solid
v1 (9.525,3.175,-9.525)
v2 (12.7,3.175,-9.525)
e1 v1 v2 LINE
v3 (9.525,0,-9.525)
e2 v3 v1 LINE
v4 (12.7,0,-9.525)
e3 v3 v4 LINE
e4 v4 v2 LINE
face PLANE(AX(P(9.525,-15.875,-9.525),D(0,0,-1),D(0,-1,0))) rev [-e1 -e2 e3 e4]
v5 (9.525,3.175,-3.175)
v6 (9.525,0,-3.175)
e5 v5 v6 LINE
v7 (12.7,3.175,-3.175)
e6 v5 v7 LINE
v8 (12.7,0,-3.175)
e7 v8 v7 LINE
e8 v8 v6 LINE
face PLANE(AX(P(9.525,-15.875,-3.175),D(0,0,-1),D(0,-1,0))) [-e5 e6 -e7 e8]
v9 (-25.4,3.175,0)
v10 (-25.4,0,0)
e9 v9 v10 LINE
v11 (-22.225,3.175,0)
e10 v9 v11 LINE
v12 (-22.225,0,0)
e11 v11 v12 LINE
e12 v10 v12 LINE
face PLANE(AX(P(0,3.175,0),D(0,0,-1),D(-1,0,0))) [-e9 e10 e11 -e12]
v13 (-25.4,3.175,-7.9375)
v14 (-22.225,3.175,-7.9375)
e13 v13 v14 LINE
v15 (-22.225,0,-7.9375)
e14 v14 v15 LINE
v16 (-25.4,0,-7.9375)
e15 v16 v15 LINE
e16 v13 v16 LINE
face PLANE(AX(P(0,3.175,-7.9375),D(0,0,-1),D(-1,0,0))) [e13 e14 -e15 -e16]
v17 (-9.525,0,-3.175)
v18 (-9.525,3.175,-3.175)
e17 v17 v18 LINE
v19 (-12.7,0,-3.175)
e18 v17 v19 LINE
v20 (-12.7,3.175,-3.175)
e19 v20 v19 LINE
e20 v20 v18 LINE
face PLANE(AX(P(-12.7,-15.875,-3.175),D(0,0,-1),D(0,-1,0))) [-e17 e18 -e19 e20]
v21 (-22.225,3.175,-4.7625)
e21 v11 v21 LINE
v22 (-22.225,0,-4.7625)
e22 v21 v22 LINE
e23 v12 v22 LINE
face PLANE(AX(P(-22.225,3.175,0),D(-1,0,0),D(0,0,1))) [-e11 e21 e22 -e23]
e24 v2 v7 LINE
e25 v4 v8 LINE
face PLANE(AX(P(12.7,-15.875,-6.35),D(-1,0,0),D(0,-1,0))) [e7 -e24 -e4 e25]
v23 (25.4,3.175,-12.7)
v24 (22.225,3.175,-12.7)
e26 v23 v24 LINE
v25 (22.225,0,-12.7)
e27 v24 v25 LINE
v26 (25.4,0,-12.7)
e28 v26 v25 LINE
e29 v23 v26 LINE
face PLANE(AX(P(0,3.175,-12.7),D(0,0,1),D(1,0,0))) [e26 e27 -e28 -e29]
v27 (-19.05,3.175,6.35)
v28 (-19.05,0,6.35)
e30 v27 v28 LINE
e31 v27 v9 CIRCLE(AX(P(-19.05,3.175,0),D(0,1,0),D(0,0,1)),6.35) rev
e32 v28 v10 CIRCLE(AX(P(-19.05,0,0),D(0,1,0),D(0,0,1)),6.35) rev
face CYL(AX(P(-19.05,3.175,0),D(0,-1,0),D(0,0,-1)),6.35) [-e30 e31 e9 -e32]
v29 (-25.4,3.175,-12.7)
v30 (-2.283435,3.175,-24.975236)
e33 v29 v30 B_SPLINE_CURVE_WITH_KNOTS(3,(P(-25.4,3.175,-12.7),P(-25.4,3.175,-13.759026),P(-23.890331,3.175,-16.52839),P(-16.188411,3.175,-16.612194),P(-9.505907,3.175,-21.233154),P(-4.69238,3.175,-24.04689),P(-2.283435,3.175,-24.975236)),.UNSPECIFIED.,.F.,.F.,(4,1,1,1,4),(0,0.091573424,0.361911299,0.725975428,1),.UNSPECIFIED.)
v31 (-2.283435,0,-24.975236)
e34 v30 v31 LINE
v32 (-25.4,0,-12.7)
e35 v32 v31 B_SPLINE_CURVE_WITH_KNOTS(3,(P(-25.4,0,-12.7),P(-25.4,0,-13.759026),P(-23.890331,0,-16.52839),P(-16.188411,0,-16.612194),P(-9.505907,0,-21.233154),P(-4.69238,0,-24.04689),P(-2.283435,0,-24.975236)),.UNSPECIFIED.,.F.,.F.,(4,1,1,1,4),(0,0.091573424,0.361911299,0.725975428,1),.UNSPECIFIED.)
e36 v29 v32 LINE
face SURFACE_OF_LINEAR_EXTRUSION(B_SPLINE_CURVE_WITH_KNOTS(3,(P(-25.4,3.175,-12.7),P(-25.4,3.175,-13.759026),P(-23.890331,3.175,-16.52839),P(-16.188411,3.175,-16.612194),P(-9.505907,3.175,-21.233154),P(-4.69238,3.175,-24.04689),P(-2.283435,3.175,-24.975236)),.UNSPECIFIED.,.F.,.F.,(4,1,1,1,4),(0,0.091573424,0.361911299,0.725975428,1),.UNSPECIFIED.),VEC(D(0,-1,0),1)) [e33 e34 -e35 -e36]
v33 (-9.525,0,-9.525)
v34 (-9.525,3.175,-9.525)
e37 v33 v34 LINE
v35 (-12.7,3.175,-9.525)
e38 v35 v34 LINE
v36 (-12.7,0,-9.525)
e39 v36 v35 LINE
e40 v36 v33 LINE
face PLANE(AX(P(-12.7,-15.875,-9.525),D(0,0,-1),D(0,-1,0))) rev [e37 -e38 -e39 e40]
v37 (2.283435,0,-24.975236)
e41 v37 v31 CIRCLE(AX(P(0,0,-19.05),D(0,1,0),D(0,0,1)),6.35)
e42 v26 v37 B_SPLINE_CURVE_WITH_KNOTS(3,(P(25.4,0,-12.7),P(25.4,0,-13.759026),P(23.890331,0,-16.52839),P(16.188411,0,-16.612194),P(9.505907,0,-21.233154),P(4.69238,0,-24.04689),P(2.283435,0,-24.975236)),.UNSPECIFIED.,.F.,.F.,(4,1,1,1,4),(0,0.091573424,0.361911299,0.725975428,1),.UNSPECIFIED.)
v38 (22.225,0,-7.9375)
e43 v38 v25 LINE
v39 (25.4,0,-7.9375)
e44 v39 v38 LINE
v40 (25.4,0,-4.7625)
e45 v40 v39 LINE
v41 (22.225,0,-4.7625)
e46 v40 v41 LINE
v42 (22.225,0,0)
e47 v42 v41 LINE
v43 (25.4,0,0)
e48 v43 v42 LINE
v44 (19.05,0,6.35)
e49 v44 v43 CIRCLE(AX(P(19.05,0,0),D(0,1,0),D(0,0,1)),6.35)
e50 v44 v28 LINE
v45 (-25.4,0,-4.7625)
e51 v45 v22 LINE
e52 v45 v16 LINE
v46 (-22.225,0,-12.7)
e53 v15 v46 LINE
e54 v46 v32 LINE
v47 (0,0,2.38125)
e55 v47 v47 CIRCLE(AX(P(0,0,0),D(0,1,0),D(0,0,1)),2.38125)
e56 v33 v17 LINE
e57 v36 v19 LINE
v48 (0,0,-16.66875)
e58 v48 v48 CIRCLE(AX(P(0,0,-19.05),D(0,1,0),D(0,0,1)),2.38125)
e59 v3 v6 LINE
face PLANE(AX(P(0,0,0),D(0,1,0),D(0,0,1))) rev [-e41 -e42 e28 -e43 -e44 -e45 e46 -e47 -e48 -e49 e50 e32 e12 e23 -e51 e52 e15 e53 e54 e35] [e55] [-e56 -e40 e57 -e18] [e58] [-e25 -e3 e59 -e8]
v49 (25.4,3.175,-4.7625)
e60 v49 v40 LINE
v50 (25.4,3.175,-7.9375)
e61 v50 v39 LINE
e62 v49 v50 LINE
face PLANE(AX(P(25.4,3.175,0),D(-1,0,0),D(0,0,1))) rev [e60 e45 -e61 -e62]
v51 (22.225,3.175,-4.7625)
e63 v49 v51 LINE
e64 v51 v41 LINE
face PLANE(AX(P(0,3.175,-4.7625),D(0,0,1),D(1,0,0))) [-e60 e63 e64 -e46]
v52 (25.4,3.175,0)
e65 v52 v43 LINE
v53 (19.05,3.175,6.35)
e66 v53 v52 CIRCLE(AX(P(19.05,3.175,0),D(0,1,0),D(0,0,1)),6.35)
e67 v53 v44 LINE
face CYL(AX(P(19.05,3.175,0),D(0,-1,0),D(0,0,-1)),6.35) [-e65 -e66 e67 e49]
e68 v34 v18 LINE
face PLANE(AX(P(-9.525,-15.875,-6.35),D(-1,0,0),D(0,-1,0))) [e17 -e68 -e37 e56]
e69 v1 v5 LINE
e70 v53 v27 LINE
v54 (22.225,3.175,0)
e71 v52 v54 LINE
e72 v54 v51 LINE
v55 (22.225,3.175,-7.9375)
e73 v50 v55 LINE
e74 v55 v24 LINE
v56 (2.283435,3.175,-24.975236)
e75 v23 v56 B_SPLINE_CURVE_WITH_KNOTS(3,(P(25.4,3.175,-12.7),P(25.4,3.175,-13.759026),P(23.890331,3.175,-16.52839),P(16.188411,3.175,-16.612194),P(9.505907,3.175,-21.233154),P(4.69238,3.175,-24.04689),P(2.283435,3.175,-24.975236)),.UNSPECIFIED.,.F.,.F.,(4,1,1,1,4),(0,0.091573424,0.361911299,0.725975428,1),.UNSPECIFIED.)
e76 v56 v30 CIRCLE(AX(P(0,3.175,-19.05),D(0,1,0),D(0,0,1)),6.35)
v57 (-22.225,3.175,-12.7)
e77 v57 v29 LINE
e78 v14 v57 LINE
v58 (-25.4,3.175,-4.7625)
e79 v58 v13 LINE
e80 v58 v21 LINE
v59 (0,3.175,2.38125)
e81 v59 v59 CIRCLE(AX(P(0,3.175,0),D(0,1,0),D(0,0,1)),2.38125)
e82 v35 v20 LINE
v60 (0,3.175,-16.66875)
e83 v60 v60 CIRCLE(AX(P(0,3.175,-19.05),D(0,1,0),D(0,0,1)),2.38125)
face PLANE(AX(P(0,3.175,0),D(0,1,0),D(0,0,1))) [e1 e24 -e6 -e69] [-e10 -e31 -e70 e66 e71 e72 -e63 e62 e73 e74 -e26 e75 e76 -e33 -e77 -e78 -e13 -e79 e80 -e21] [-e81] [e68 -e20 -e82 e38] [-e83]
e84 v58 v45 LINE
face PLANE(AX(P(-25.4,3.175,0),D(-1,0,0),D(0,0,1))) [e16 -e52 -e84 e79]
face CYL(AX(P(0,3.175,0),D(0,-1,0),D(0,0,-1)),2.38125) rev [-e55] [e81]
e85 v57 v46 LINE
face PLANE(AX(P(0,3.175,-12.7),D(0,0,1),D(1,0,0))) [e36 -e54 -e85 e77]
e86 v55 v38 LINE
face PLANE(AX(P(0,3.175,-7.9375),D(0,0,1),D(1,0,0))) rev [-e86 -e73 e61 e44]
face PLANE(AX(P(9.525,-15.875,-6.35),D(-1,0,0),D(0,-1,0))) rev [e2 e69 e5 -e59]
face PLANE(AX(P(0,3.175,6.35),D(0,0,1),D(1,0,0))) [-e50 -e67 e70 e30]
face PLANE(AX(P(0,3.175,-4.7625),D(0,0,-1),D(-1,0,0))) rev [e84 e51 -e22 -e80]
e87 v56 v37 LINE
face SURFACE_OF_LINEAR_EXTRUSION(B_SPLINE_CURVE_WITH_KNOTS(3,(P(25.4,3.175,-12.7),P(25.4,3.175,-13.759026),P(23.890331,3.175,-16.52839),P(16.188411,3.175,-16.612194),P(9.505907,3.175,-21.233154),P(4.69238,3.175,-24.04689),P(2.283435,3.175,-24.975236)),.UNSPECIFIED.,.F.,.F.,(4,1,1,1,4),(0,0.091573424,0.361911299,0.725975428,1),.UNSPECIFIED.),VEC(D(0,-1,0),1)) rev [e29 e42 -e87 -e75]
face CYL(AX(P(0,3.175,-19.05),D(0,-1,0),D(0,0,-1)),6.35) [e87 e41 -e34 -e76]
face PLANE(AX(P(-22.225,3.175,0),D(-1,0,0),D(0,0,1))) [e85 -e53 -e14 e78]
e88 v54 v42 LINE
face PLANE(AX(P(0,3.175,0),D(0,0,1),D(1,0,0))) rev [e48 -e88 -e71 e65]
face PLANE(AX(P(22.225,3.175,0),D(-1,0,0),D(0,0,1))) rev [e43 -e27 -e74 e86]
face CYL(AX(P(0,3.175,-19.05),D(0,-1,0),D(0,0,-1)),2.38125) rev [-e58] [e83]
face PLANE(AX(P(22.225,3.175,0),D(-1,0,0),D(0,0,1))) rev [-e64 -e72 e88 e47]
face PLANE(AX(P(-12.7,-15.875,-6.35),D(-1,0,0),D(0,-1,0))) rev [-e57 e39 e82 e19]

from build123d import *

# Parameters (mm, degrees)
SKETCH1_R           = 2.38125
BOSS_EXTRUDE1_DEPTH = 3.175
CAVITY1_START       = -9.525
CAVITY1_OUTLINE_W   = 3.175
CAVITY1_OUTLINE_H   = 3.175
CAVITY1_DEPTH       = 6.35


# Read off the part's stored shape, not the designer's step: Cavity1
with BuildPart() as part:
    # Sketch1 → Boss-Extrude1 (new body)
    # profile 1 of 4: a face of its own
    with BuildSketch(Plane(origin=(0, 0, 0), x_dir=(1, 0, 0), z_dir=(0, 1, 0))):
        with BuildLine():
            Line((-19.05, -6.35), (19.05, -6.35))
            ThreePointArc((19.05, -6.35), (23.540128061, -4.490128061), (25.4, 0))
            Line((25.4, 0), (22.225, 0))
            Line((22.225, 0), (22.225, 4.7625))
            Line((22.225, 4.7625), (25.4, 4.7625))
            Line((25.4, 4.7625), (25.4, 7.9375))
            Line((25.4, 7.9375), (22.225, 7.9375))
            Line((22.225, 7.9375), (22.225, 12.7))
            Line((22.225, 12.7), (0, 12.7))
            Line((0, 12.7), (-22.225, 12.7))
            Line((-22.225, 12.7), (-22.225, 7.9375))
            Line((-22.225, 7.9375), (-25.4, 7.9375))
            Line((-25.4, 7.9375), (-25.4, 4.7625))
            Line((-25.4, 4.7625), (-22.225, 4.7625))
            Line((-22.225, 4.7625), (-22.225, 0))
            Line((-22.225, 0), (-25.4, 0))
            ThreePointArc((-25.4, 0), (-23.540128061, -4.490128061), (-19.05, -6.35))
        make_face()
        with BuildLine():
            ThreePointArc((0, 2.38125), (1.683798023, 1.683798023), (2.38125, 0))
            ThreePointArc((2.38125, 0), (-1.683798023, -1.683798023), (0, 2.38125))
        make_face(mode=Mode.SUBTRACT)
    # profile 2 of 4: a face of its own
    with BuildSketch(Plane(origin=(0, 0, 0), x_dir=(1, 0, 0), z_dir=(0, 1, 0))):
        with BuildLine():
            Line((0, 12.7), (22.225, 12.7))
            Line((22.225, 12.7), (25.4, 12.7))
            add(Edge.make_bspline(
                [(25.4, 12.7), (25.4, 13.75902599), (23.890330765, 16.528390246), (16.188410672, 16.612194154), (9.505907267, 21.233154333), (4.692379923, 24.046890427), (2.283434696, 24.975236366)],
                knots=[0, 0, 0, 0, 0.091573424, 0.361911299, 0.725975428, 1, 1, 1, 1], degree=3))
            ThreePointArc((2.283434696, 24.975236366), (5.235566365, 22.643235984), (6.35, 19.05))
            ThreePointArc((6.35, 19.05), (4.490128061, 14.559871939), (0, 12.7))
        make_face()
    # profile 3 of 4: a face of its own
    with BuildSketch(Plane(origin=(0, 0, 0), x_dir=(1, 0, 0), z_dir=(0, 1, 0))):
        with BuildLine():
            Line((-25.4, 12.7), (-22.225, 12.7))
            Line((-22.225, 12.7), (0, 12.7))
            ThreePointArc((0, 12.7), (-6.242906011, 17.888697051), (-2.283434696, 24.975236366))
            add(Edge.make_bspline(
                [(-25.4, 12.7), (-25.4, 13.75902599), (-23.890330765, 16.528390246), (-16.188410672, 16.612194154), (-9.505907267, 21.233154333), (-4.692379923, 24.046890427), (-2.283434696, 24.975236366)],
                knots=[0, 0, 0, 0, 0.091573424, 0.361911299, 0.725975428, 1, 1, 1, 1], degree=3))
        make_face()
    # profile 4 of 4: a face of its own
    with BuildSketch(Plane(origin=(0, 0, 0), x_dir=(1, 0, 0), z_dir=(0, 1, 0))):
        with BuildLine():
            ThreePointArc((-2.283434696, 24.975236366), (-6.242906011, 17.888697051), (0, 12.7))
            ThreePointArc((0, 12.7), (4.490128061, 14.559871939), (6.35, 19.05))
            ThreePointArc((6.35, 19.05), (5.235566365, 22.643235984), (2.283434696, 24.975236366))
            ThreePointArc((2.283434696, 24.975236366), (0, 25.4), (-2.283434696, 24.975236366))
        make_face()
        with Locations(Location((0, 19.05, 0), (0, 0, 270))):
            Circle(SKETCH1_R, mode=Mode.SUBTRACT)
    extrude(amount=BOSS_EXTRUDE1_DEPTH)

    # Cavity1 outline → Cavity1 (cut)
    with BuildSketch(Plane.XY.offset(CAVITY1_START)):
        with Locations((11.1125, 1.5875)):
            Rectangle(CAVITY1_OUTLINE_W, CAVITY1_OUTLINE_H)
        with Locations((-11.1125, 1.5875)):
            Rectangle(CAVITY1_OUTLINE_W, CAVITY1_OUTLINE_H)
    extrude(amount=CAVITY1_DEPTH, mode=Mode.SUBTRACT)


solid = part.part
